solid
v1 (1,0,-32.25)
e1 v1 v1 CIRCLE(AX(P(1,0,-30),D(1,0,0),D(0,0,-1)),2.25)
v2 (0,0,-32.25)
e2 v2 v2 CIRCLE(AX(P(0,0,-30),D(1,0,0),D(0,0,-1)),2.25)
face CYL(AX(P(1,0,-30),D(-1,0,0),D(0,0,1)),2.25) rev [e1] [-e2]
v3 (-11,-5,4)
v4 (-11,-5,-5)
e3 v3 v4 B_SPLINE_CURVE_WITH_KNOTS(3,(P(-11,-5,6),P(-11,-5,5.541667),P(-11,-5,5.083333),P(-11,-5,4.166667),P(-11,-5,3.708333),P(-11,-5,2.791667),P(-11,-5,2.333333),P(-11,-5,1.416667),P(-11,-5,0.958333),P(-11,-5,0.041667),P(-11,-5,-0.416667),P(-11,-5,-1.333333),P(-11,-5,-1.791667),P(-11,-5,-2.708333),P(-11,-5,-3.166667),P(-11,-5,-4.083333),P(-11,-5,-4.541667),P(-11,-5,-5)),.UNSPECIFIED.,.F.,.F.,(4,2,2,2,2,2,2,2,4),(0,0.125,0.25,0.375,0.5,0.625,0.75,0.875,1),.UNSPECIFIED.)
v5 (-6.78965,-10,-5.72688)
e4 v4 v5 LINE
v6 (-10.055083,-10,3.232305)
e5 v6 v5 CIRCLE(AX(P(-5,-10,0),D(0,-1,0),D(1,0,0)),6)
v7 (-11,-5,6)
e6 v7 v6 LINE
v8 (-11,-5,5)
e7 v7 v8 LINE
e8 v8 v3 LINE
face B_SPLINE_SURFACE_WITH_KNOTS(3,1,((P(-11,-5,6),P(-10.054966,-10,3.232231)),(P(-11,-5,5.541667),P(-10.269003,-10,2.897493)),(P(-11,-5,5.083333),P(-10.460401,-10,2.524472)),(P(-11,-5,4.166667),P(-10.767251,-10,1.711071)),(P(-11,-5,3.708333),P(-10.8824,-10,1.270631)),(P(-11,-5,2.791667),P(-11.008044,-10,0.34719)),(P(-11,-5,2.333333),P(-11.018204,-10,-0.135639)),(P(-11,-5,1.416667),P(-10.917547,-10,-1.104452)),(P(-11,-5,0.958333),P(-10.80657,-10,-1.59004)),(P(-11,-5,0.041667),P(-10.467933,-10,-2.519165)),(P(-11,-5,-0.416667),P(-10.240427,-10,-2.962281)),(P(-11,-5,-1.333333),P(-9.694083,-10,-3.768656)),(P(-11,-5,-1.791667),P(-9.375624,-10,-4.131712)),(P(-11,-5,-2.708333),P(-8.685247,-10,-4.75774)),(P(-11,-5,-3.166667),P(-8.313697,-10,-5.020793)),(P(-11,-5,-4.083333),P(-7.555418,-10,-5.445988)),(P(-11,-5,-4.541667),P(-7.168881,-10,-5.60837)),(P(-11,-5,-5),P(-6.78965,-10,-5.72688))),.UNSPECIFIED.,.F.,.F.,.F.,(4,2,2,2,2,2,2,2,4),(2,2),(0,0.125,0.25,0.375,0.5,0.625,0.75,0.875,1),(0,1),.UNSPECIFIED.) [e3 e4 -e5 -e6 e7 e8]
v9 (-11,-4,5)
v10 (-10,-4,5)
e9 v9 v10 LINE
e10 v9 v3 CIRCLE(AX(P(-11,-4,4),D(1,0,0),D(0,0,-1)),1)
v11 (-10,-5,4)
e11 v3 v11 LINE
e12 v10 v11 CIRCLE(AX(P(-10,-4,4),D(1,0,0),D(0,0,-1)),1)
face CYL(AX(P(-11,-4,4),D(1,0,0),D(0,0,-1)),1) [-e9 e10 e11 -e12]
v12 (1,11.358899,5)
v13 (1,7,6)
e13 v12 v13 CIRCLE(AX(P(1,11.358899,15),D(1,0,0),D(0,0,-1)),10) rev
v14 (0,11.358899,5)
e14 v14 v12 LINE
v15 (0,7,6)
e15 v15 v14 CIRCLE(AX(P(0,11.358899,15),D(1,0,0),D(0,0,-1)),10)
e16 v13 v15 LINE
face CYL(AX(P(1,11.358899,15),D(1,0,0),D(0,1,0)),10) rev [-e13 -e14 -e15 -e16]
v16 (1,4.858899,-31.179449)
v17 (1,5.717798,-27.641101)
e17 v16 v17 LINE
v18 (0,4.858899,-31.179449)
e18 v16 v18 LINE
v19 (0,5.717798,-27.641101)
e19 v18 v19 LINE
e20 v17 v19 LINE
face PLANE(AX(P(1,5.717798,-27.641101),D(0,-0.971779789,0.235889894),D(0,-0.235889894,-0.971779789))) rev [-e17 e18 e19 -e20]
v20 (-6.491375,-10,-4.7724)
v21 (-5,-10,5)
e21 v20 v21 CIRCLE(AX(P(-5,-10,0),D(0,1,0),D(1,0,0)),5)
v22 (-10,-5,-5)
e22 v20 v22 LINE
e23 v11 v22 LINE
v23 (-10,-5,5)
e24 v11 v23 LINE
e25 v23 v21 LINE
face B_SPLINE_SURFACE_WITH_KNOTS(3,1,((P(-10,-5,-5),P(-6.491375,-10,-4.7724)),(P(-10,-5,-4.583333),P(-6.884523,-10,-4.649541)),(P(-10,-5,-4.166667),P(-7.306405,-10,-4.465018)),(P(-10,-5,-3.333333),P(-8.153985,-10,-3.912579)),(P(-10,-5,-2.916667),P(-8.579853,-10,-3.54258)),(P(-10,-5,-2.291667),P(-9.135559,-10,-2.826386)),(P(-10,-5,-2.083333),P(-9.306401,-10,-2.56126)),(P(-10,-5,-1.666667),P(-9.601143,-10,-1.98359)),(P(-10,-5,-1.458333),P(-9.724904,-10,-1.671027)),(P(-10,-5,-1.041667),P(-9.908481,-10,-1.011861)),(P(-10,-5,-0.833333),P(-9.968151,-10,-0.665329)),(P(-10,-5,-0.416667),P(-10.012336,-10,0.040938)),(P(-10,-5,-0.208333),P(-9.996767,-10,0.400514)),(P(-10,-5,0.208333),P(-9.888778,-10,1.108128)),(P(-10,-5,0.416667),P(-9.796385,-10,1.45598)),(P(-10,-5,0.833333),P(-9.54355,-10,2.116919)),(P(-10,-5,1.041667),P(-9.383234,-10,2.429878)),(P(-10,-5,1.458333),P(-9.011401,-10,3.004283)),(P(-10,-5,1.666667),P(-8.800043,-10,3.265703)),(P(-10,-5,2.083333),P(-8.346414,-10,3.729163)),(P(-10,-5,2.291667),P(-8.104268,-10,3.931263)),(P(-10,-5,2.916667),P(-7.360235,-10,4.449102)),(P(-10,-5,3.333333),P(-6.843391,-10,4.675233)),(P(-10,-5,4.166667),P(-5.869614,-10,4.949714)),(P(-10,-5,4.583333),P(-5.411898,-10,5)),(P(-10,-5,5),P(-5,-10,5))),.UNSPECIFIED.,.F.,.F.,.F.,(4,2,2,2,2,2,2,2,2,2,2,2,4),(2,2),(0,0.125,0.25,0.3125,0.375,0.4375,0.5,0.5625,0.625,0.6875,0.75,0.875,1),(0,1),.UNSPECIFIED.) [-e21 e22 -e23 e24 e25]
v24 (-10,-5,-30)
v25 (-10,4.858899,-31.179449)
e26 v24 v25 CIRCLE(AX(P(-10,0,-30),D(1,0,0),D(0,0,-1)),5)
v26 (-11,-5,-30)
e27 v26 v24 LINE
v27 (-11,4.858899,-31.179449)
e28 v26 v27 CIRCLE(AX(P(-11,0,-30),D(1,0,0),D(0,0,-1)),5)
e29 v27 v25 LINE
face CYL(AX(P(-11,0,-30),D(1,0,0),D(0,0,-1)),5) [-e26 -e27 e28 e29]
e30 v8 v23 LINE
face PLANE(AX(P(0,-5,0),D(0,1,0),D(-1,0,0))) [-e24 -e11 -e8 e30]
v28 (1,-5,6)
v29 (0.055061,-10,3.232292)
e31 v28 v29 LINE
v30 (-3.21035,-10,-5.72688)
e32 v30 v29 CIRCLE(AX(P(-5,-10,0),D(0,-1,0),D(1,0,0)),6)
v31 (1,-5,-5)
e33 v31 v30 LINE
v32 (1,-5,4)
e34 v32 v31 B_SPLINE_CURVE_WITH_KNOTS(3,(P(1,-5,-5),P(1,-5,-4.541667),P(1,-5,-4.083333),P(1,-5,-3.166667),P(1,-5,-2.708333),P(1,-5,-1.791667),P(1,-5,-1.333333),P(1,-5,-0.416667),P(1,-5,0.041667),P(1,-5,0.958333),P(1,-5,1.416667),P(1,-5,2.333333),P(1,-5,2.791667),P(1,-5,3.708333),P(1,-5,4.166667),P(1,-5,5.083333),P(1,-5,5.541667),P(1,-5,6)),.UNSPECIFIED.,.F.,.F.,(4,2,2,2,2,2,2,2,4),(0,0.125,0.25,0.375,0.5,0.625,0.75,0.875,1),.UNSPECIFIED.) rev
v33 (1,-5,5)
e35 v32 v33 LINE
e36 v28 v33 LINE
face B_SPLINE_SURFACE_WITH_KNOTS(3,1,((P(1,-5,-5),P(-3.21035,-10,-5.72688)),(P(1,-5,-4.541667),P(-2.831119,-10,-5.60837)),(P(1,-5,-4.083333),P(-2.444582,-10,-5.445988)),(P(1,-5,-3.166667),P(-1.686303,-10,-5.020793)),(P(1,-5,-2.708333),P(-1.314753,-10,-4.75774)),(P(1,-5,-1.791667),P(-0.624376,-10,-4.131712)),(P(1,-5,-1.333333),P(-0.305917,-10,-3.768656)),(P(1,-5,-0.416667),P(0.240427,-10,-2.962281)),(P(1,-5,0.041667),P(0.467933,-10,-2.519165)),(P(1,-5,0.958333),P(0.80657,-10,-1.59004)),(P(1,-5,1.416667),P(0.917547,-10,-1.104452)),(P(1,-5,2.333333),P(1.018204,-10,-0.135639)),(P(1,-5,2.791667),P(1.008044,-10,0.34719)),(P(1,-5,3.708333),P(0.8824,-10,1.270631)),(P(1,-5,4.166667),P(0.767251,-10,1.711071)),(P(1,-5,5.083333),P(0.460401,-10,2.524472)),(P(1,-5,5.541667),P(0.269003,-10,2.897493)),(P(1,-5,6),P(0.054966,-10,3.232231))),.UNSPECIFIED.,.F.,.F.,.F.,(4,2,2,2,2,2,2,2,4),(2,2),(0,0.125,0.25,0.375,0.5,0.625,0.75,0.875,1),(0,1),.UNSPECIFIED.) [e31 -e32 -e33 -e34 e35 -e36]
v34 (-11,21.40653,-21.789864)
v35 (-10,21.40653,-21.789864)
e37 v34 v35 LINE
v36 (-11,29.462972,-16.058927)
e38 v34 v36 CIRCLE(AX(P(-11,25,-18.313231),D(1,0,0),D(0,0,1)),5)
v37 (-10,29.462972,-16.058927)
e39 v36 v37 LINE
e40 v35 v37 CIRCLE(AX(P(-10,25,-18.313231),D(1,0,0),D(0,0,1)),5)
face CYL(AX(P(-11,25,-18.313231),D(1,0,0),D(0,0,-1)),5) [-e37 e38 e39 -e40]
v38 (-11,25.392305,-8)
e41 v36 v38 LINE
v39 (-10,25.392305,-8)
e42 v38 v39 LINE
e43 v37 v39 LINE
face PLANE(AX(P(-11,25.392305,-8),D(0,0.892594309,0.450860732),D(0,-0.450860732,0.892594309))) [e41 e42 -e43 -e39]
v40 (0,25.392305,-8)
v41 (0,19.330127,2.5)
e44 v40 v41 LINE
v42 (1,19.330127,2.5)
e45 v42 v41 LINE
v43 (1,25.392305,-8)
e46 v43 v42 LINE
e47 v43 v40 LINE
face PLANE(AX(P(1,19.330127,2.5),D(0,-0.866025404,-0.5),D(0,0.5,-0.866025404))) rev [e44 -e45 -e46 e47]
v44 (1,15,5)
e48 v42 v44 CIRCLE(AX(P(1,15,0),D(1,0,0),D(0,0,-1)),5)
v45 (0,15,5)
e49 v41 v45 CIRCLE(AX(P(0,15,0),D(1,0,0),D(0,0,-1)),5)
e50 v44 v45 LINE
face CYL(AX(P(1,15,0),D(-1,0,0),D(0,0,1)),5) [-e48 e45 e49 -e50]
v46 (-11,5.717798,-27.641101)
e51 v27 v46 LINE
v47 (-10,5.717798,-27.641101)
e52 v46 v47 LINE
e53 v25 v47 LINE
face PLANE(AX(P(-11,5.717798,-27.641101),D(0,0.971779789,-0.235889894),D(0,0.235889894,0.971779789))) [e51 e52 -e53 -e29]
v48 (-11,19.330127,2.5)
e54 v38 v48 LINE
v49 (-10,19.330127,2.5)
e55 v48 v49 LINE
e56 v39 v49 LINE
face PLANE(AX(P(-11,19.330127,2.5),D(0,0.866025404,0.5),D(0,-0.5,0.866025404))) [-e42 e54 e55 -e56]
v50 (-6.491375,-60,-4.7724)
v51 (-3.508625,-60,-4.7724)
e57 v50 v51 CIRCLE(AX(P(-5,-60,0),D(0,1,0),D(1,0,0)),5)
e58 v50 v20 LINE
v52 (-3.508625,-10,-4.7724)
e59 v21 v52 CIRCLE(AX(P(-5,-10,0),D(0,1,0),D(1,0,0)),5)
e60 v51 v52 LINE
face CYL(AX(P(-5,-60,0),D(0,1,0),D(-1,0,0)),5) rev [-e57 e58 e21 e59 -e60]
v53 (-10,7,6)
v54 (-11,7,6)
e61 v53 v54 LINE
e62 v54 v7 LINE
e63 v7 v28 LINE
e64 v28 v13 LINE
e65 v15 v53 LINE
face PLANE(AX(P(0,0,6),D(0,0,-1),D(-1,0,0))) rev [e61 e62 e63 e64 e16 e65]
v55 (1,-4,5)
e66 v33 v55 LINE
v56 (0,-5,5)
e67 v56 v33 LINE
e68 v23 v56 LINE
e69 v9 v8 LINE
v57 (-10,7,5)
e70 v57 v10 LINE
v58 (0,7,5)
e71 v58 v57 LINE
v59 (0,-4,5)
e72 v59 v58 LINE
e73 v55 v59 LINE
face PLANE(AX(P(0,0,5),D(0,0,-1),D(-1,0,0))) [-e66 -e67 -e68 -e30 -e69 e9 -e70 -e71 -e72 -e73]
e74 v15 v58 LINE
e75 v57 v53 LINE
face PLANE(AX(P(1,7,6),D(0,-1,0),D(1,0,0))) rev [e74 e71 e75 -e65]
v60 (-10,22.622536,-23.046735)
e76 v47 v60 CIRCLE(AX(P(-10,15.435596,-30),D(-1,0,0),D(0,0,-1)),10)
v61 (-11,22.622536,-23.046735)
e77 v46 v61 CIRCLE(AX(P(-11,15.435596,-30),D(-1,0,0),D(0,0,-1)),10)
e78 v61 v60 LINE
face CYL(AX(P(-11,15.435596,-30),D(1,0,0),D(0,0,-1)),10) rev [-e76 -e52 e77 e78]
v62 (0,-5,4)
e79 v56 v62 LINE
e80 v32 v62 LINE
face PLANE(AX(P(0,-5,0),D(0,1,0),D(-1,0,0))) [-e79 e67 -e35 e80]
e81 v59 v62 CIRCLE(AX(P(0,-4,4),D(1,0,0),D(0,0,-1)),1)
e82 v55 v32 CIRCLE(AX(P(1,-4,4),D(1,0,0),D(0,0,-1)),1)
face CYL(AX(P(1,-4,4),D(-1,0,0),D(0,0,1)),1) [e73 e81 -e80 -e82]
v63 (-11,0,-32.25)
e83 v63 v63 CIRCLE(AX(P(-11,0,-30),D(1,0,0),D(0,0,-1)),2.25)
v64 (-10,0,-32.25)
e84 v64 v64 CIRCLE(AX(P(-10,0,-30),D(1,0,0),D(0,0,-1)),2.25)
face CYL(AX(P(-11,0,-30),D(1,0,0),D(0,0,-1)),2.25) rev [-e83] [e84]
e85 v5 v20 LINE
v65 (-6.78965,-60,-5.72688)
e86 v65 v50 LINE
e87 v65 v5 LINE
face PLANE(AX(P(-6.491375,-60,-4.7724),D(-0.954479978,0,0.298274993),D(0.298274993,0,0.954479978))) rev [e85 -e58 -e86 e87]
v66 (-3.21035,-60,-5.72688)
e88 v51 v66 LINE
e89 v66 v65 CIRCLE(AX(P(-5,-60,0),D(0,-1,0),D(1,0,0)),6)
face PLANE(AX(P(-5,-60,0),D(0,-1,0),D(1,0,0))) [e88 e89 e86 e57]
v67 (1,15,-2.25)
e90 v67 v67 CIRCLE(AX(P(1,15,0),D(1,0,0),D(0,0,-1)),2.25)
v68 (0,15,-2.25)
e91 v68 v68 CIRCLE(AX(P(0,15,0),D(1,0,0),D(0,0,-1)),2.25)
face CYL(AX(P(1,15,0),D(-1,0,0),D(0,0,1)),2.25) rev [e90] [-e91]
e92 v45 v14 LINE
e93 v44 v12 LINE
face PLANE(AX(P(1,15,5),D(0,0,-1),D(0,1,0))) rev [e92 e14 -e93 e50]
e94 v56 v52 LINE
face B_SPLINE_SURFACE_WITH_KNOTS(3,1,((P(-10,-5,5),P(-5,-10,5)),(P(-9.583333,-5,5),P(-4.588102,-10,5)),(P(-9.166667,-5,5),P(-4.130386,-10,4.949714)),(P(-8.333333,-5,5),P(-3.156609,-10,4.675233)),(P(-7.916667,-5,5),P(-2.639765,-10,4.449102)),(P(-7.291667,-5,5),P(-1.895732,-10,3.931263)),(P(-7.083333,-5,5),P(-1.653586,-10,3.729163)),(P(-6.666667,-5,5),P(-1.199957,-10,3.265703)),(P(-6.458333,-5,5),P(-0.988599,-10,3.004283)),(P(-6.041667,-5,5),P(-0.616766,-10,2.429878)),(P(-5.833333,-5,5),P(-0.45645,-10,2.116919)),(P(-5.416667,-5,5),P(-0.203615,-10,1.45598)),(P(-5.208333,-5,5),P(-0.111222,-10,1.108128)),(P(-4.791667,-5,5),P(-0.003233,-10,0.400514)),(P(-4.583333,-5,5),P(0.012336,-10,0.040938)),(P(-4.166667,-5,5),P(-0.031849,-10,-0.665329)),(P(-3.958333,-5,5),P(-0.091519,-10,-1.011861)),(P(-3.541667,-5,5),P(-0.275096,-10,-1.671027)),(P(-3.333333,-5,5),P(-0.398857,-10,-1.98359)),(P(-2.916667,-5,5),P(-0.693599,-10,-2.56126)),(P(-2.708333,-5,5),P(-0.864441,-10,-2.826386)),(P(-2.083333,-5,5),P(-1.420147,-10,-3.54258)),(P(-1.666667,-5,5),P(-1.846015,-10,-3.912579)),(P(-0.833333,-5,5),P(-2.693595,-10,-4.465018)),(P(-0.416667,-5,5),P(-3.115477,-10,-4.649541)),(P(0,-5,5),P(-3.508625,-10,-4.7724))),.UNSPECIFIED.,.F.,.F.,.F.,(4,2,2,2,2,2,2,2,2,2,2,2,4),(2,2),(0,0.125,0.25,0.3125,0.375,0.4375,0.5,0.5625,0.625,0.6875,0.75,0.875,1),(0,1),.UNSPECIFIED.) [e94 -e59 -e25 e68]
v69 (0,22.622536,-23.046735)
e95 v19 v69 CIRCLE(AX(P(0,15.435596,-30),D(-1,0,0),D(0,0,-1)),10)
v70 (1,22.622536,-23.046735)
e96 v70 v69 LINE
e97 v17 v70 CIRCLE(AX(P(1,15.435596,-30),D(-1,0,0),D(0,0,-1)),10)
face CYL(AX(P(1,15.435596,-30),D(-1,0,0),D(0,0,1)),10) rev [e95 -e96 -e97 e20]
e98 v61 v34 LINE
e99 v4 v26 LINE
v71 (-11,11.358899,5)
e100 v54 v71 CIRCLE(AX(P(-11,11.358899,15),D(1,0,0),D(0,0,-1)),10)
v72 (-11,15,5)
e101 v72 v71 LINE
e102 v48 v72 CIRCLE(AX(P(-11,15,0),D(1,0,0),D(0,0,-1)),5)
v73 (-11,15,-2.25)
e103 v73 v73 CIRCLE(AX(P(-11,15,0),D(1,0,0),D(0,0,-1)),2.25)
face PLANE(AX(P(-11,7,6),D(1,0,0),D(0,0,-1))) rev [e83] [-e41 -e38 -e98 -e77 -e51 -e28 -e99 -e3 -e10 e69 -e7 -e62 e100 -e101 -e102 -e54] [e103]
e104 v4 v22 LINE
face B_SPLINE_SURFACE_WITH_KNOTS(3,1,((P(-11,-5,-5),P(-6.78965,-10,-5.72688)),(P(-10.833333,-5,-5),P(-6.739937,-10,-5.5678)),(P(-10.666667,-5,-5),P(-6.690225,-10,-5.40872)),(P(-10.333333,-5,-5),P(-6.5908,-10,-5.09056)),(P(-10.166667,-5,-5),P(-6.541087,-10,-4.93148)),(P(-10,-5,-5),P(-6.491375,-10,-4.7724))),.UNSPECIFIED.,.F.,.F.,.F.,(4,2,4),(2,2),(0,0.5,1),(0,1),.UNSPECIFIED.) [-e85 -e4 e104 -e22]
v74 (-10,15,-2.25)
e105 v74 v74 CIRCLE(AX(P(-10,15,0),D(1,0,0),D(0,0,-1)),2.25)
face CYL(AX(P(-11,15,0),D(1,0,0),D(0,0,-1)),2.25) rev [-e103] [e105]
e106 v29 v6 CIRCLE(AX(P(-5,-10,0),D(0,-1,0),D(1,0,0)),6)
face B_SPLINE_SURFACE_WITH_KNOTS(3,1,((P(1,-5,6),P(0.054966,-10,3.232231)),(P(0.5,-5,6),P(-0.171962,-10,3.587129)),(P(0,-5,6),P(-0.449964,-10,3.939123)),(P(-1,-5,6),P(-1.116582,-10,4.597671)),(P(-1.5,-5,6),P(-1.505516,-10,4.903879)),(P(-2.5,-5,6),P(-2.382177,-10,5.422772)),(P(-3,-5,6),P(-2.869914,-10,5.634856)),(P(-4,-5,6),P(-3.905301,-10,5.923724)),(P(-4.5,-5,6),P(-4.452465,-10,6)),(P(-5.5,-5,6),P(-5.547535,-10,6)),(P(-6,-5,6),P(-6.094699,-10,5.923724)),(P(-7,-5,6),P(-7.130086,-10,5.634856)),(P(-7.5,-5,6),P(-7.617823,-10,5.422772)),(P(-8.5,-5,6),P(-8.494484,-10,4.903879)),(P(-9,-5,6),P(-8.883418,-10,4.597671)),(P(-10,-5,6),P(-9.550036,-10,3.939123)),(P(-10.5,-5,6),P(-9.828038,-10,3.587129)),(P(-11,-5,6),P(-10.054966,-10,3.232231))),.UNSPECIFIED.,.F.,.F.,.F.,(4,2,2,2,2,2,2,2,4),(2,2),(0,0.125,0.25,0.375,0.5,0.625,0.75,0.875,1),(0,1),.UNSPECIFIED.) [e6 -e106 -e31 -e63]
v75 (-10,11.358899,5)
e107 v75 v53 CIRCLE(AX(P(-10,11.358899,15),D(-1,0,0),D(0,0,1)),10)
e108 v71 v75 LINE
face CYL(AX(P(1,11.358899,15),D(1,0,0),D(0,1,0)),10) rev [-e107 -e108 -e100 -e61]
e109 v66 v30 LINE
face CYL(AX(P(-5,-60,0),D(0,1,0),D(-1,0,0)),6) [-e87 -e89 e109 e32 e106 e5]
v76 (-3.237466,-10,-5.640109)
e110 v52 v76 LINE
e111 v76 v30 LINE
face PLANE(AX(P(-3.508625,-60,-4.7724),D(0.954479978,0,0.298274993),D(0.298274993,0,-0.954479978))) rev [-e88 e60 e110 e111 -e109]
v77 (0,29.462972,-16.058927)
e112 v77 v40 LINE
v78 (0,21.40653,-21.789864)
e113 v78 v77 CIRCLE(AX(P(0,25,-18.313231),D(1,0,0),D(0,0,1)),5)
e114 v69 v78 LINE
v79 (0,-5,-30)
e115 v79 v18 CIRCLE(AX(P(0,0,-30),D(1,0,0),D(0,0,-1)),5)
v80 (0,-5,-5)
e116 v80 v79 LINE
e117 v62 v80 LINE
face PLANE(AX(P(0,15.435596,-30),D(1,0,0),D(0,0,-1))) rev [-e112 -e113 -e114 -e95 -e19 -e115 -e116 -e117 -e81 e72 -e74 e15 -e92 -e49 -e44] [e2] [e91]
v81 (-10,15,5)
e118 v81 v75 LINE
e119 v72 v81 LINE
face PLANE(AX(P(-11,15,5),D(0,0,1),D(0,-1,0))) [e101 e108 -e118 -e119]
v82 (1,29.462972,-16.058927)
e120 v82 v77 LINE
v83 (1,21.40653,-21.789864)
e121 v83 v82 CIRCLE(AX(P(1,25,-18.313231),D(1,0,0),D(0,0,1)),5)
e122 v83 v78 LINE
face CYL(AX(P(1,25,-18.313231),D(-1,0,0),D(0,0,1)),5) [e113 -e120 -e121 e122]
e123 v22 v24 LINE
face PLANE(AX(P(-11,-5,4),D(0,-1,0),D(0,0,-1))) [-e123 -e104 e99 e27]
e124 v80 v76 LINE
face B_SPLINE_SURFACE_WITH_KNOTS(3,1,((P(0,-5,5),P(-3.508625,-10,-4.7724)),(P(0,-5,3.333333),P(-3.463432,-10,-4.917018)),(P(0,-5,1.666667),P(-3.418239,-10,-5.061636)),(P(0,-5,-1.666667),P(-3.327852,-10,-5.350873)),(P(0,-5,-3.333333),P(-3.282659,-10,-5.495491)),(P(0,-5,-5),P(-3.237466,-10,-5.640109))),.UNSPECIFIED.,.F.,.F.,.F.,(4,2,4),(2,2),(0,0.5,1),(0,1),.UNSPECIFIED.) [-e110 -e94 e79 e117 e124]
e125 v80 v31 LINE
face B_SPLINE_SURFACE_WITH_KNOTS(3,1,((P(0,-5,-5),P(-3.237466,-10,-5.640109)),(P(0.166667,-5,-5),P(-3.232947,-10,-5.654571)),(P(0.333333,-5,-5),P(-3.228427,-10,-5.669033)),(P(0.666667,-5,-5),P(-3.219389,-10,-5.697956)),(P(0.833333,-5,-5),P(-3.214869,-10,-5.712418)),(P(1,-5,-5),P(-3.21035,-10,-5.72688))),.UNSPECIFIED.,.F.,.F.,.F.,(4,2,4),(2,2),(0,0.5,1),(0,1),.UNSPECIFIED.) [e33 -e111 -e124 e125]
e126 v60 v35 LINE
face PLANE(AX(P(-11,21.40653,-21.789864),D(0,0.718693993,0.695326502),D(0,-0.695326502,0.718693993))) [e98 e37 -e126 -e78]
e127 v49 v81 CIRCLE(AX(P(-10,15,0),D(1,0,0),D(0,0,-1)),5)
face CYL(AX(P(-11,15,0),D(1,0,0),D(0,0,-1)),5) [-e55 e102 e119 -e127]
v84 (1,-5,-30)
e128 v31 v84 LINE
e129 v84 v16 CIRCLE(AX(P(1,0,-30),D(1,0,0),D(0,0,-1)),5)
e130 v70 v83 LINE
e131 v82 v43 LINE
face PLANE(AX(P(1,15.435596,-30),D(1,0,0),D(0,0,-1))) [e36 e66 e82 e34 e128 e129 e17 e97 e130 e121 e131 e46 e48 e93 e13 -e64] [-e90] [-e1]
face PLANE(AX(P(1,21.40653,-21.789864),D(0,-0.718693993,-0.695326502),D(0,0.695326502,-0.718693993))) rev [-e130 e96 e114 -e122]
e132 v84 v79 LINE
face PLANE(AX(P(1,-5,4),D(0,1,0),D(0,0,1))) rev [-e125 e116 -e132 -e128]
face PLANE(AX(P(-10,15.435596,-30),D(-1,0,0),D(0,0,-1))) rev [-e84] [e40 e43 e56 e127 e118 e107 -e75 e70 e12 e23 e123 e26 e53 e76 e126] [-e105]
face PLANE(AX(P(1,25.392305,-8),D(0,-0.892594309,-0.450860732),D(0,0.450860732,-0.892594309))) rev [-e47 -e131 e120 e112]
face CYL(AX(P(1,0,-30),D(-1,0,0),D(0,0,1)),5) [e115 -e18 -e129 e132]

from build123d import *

# Parameters (mm, degrees)
SKETCH1_R            = 2.25
BOSS_EXTRUDE1_DEPTH  = 1
SKETCH2_R            = 3
BOSS_EXTRUDE2_DEPTH  = 10
SKETCH3_R            = 3.5
BOSS_EXTRUDE3_DEPTH  = 1.5
FILLET1_R            = 0.5
FILLET2_R            = 0.5
SKETCH4_W            = 12
SKETCH4_H            = 12
BOSS_EXTRUDE4_DEPTH  = 1
FILLET1_OF_MIRROR1_R = 0.5
FILLET2_OF_MIRROR1_R = 0.5
BOSS_EXTRUDE5_DEPTH  = 50
FILLET3_R            = 10
SKETCH8_R            = 8.284786219
CUT_EXTRUDE1_DEPTH   = 15
SKETCH9_R            = 7.33981862
CUT_EXTRUDE2_DEPTH   = 15


with BuildPart() as part:
    # Sketch1 → Boss-Extrude1 (new body)
    with BuildSketch(Plane(origin=(0, 0, 0), x_dir=(0, 0, -1), z_dir=(1, 0, 0))):
        with BuildLine():
            Line((-5, 15), (-5, -4))
            ThreePointArc((-5, -4), (-4.707106781, -4.707106781), (-4, -5))
            Line((-4, -5), (30, -5))
            ThreePointArc((30, -5), (34.964599416, -0.593929828), (31.179449472, 4.858898944))
            Line((31.179449472, 4.858898944), (27.641101056, 5.717797887))
            ThreePointArc((27.641101056, 5.717797887), (20.35004458, 12.812932929), (23.046734983, 22.622535708))
            Line((23.046734983, 22.622535708), (21.789863611, 21.406530033))
            ThreePointArc((21.789863611, 21.406530033), (22.387551219, 27.898260788), (16.058927441, 29.462971544))
            Line((16.058927441, 29.462971544), (8, 25.392304845))
            Line((8, 25.392304845), (-2.5, 19.330127019))
            ThreePointArc((-2.5, 19.330127019), (-4.330127019, 17.5), (-5, 15))
        make_face()
        with Locations((0, 15)):
            Circle(SKETCH1_R, mode=Mode.SUBTRACT)
        with Locations((30, 0)):
            Circle(SKETCH1_R, mode=Mode.SUBTRACT)
    boss_extrude1 = extrude(amount=BOSS_EXTRUDE1_DEPTH)

    # Sketch2 → Boss-Extrude2 (add)
    with BuildSketch(Plane(origin=(1, 0, 0), x_dir=(0, 0, -1), z_dir=(1, 0, 0))):
        with Locations((18.313231103, 25)):
            Circle(SKETCH2_R)
    boss_extrude2 = extrude(amount=BOSS_EXTRUDE2_DEPTH)

    # Sketch3 → Boss-Extrude3 (add)
    with BuildSketch(Plane(origin=(11, 0, 0), x_dir=(0, 0, -1), z_dir=(1, 0, 0))):
        with Locations((18.313231103, 25)):
            Circle(SKETCH3_R)
    boss_extrude3 = extrude(amount=-BOSS_EXTRUDE3_DEPTH)

    # Fillet1
    fillet1_edges = [part.edges().sort_by_distance(p)[0] for p in [
        (1, 25, -15.313231103),
        (9.5, 25, -14.813231103),
        (11, 25, -14.813231103),
    ]]
    fillet(fillet1_edges, radius=FILLET1_R - 0.0001)  # a hair under: the kernel refuses the full size

    # Fillet2
    fillet2_edges = [part.edges().sort_by_distance(p)[0] for p in [
        (9.5, 25, -15.313231103),
    ]]
    fillet(fillet2_edges, radius=FILLET2_R)

    # Sketch4 → Boss-Extrude4 (add)
    with BuildSketch(Plane.XY.offset(5)):
        with Locations((-5, 1)):
            Rectangle(SKETCH4_W, SKETCH4_H)
    extrude(amount=BOSS_EXTRUDE4_DEPTH)

    # Mirror1: Boss-Extrude1, Boss-Extrude2, Boss-Extrude3 across plane
    add(boss_extrude1.mirror(Plane(origin=(-5, 0, 0), x_dir=(0, 0, 1), z_dir=(1, 0, 0))))
    add(boss_extrude2.mirror(Plane(origin=(-5, 0, 0), x_dir=(0, 0, 1), z_dir=(1, 0, 0))))
    add(boss_extrude3.mirror(Plane(origin=(-5, 0, 0), x_dir=(0, 0, 1), z_dir=(1, 0, 0))))

    # Fillet1 of Mirror1
    fillet1_of_mirror1_edges = [part.edges().sort_by_distance(p)[0] for p in [
        (-11, 25, -15.313231103),
        (-19.5, 25, -14.813231103),
        (-21, 25, -14.813231103),
    ]]
    fillet(fillet1_of_mirror1_edges, radius=FILLET1_OF_MIRROR1_R - 0.0001)  # a hair under: the kernel refuses the full size

    # Fillet2 of Mirror1
    fillet2_of_mirror1_edges = [part.edges().sort_by_distance(p)[0] for p in [
        (-19.5, 25, -15.313231103),
    ]]
    fillet(fillet2_of_mirror1_edges, radius=FILLET2_OF_MIRROR1_R)

    # Loft1: read off the stored shape, not the designer's step
    # Loft1: loft between two sections, ruled curve by curve
    loft1_from = [
        Edge.make_bspline([(-10, -5, -5), (-10, -5, -4.583333333), (-10, -5, -4.166666667), (-10, -5, -3.333333333), (-10, -5, -2.916666667), (-10, -5, -2.291666667), (-10, -5, -2.083333333), (-10, -5, -1.666666667), (-10, -5, -1.458333333), (-10, -5, -1.041666667), (-10, -5, -0.833333333), (-10, -5, -0.416666667), (-10, -5, -0.208333333), (-10, -5, 0.208333333), (-10, -5, 0.416666667), (-10, -5, 0.833333333), (-10, -5, 1.041666667), (-10, -5, 1.458333333), (-10, -5, 1.666666667), (-10, -5, 2.083333333), (-10, -5, 2.291666667), (-10, -5, 2.916666667), (-10, -5, 3.333333333), (-10, -5, 4.166666667), (-10, -5, 4.583333333), (-10, -5, 5)], [0, 0, 0, 0, 0.125, 0.125, 0.25, 0.25, 0.3125, 0.3125, 0.375, 0.375, 0.4375, 0.4375, 0.5, 0.5, 0.5625, 0.5625, 0.625, 0.625, 0.6875, 0.6875, 0.75, 0.75, 0.875, 0.875, 1, 1, 1, 1], 3),
        Edge.make_bspline([(-10, -5, 5), (-9.583333333, -5, 5), (-9.166666667, -5, 5), (-8.333333333, -5, 5), (-7.916666667, -5, 5), (-7.291666667, -5, 5), (-7.083333333, -5, 5), (-6.666666667, -5, 5), (-6.458333333, -5, 5), (-6.041666667, -5, 5), (-5.833333333, -5, 5), (-5.416666667, -5, 5), (-5.208333333, -5, 5), (-4.791666667, -5, 5), (-4.583333333, -5, 5), (-4.166666667, -5, 5), (-3.958333333, -5, 5), (-3.541666667, -5, 5), (-3.333333333, -5, 5), (-2.916666667, -5, 5), (-2.708333333, -5, 5), (-2.083333333, -5, 5), (-1.666666667, -5, 5), (-0.833333333, -5, 5), (-0.416666667, -5, 5), (0, -5, 5)], [0, 0, 0, 0, 0.125, 0.125, 0.25, 0.25, 0.3125, 0.3125, 0.375, 0.375, 0.4375, 0.4375, 0.5, 0.5, 0.5625, 0.5625, 0.625, 0.625, 0.6875, 0.6875, 0.75, 0.75, 0.875, 0.875, 1, 1, 1, 1], 3),
        Edge.make_bspline([(-11, -5, -5), (-10.833333333, -5, -5), (-10.666666667, -5, -5), (-10.333333333, -5, -5), (-10.166666667, -5, -5), (-10, -5, -5)], [0, 0, 0, 0, 0.5, 0.5, 1, 1, 1, 1], 3),
        Edge.make_bspline([(0, -5, 5), (0, -5, 3.333333333), (0, -5, 1.666666667), (0, -5, -1.666666667), (0, -5, -3.333333333), (0, -5, -5)], [0, 0, 0, 0, 0.5, 0.5, 1, 1, 1, 1], 3),
        Edge.make_bspline([(0, -5, -5), (0.166666667, -5, -5), (0.333333333, -5, -5), (0.666666667, -5, -5), (0.833333333, -5, -5), (1, -5, -5)], [0, 0, 0, 0, 0.5, 0.5, 1, 1, 1, 1], 3),
        Edge.make_bspline([(1, -5, -5), (1, -5, -4.541666667), (1, -5, -4.083333333), (1, -5, -3.166666667), (1, -5, -2.708333333), (1, -5, -1.791666667), (1, -5, -1.333333333), (1, -5, -0.416666667), (1, -5, 0.041666667), (1, -5, 0.958333333), (1, -5, 1.416666667), (1, -5, 2.333333333), (1, -5, 2.791666667), (1, -5, 3.708333333), (1, -5, 4.166666667), (1, -5, 5.083333333), (1, -5, 5.541666667), (1, -5, 6)], [0, 0, 0, 0, 0.125, 0.125, 0.25, 0.25, 0.375, 0.375, 0.5, 0.5, 0.625, 0.625, 0.75, 0.75, 0.875, 0.875, 1, 1, 1, 1], 3),
        Edge.make_bspline([(1, -5, 6), (0.5, -5, 6), (0, -5, 6), (-1, -5, 6), (-1.5, -5, 6), (-2.5, -5, 6), (-3, -5, 6), (-4, -5, 6), (-4.5, -5, 6), (-5.5, -5, 6), (-6, -5, 6), (-7, -5, 6), (-7.5, -5, 6), (-8.5, -5, 6), (-9, -5, 6), (-10, -5, 6), (-10.5, -5, 6), (-11, -5, 6)], [0, 0, 0, 0, 0.125, 0.125, 0.25, 0.25, 0.375, 0.375, 0.5, 0.5, 0.625, 0.625, 0.75, 0.75, 0.875, 0.875, 1, 1, 1, 1], 3),
        Edge.make_bspline([(-11, -5, 6), (-11, -5, 5.541666667), (-11, -5, 5.083333333), (-11, -5, 4.166666667), (-11, -5, 3.708333333), (-11, -5, 2.791666667), (-11, -5, 2.333333333), (-11, -5, 1.416666667), (-11, -5, 0.958333333), (-11, -5, 0.041666667), (-11, -5, -0.416666667), (-11, -5, -1.333333333), (-11, -5, -1.791666667), (-11, -5, -2.708333333), (-11, -5, -3.166666667), (-11, -5, -4.083333333), (-11, -5, -4.541666667), (-11, -5, -5)], [0, 0, 0, 0, 0.125, 0.125, 0.25, 0.25, 0.375, 0.375, 0.5, 0.5, 0.625, 0.625, 0.75, 0.75, 0.875, 0.875, 1, 1, 1, 1], 3),
    ]
    loft1_to = [
        Edge.make_bspline([(-6.491374966, -10, -4.77239989), (-6.884523079, -10, -4.649541105), (-7.306405333, -10, -4.465018398), (-8.153984507, -10, -3.912579276), (-8.579853175, -10, -3.542579514), (-9.13555864, -10, -2.826386266), (-9.306401184, -10, -2.561259986), (-9.601142837, -10, -1.983589792), (-9.724904097, -10, -1.6710271), (-9.908481295, -10, -1.011860503), (-9.968151405, -10, -0.665329215), (-10.012336326, -10, 0.040937796), (-9.996767222, -10, 0.400514491), (-9.888777725, -10, 1.108127646), (-9.796385387, -10, 1.455980277), (-9.543549977, -10, 2.116918741), (-9.383234434, -10, 2.429877815), (-9.011400762, -10, 3.004282647), (-8.800043483, -10, 3.265702589), (-8.346413903, -10, 3.729163159), (-8.104267576, -10, 3.931262826), (-7.360235299, -10, 4.449101898), (-6.843390506, -10, 4.675233288), (-5.86961438, -10, 4.949713698), (-5.411897706, -10, 5), (-5, -10, 5)], [0, 0, 0, 0, 0.125, 0.125, 0.25, 0.25, 0.3125, 0.3125, 0.375, 0.375, 0.4375, 0.4375, 0.5, 0.5, 0.5625, 0.5625, 0.625, 0.625, 0.6875, 0.6875, 0.75, 0.75, 0.875, 0.875, 1, 1, 1, 1], 3),
        Edge.make_bspline([(-5, -10, 5), (-4.588102294, -10, 5), (-4.13038562, -10, 4.949713698), (-3.156609494, -10, 4.675233288), (-2.639764701, -10, 4.449101898), (-1.895732424, -10, 3.931262826), (-1.653586097, -10, 3.729163159), (-1.199956517, -10, 3.265702589), (-0.988599238, -10, 3.004282647), (-0.616765566, -10, 2.429877815), (-0.456450023, -10, 2.116918741), (-0.203614613, -10, 1.455980277), (-0.111222275, -10, 1.108127646), (-0.003232778, -10, 0.400514491), (0.012336326, -10, 0.040937796), (-0.031848595, -10, -0.665329215), (-0.091518705, -10, -1.011860503), (-0.275095903, -10, -1.6710271), (-0.398857163, -10, -1.983589792), (-0.693598816, -10, -2.561259986), (-0.86444136, -10, -2.826386266), (-1.420146825, -10, -3.542579514), (-1.846015493, -10, -3.912579276), (-2.693594667, -10, -4.465018398), (-3.115476921, -10, -4.649541105), (-3.508625034, -10, -4.77239989)], [0, 0, 0, 0, 0.125, 0.125, 0.25, 0.25, 0.3125, 0.3125, 0.375, 0.375, 0.4375, 0.4375, 0.5, 0.5, 0.5625, 0.5625, 0.625, 0.625, 0.6875, 0.6875, 0.75, 0.75, 0.875, 0.875, 1, 1, 1, 1], 3),
        Edge.make_bspline([(-6.789649959, -10, -5.726879868), (-6.73993746, -10, -5.567799872), (-6.690224961, -10, -5.408719876), (-6.590799963, -10, -5.090559883), (-6.541087465, -10, -4.931479887), (-6.491374966, -10, -4.77239989)], [0, 0, 0, 0, 0.5, 0.5, 1, 1, 1, 1], 3),
        Edge.make_bspline([(-3.508625034, -10, -4.77239989), (-3.463431854, -10, -4.917018069), (-3.418238673, -10, -5.061636247), (-3.327852311, -10, -5.350872604), (-3.28265913, -10, -5.495490783), (-3.23746595, -10, -5.640108961)], [0, 0, 0, 0, 0.5, 0.5, 1, 1, 1, 1], 3),
        Edge.make_bspline([(-3.23746595, -10, -5.640108961), (-3.232946632, -10, -5.654570779), (-3.228427313, -10, -5.669032597), (-3.219388677, -10, -5.697956233), (-3.214869359, -10, -5.71241805), (-3.210350041, -10, -5.726879868)], [0, 0, 0, 0, 0.5, 0.5, 1, 1, 1, 1], 3),
        Edge.make_bspline([(-3.210350041, -10, -5.726879868), (-2.831118631, -10, -5.608370053), (-2.444582437, -10, -5.445988039), (-1.68630321, -10, -5.020792589), (-1.314753176, -10, -4.757739856), (-0.6243761, -10, -4.131712499), (-0.305916835, -10, -3.768655763), (0.240427003, -10, -2.962280853), (0.467933473, -10, -2.519164633), (0.80657041, -10, -1.590039936), (0.917547461, -10, -1.104452382), (1.018204484, -10, -0.135638547), (1.008043933, -10, 0.34718985), (0.882399891, -10, 1.27063142), (0.767250763, -10, 1.711070799), (0.460401457, -10, 2.524472335), (0.269002994, -10, 2.897493483), (0.054966106, -10, 3.232231066)], [0, 0, 0, 0, 0.125, 0.125, 0.25, 0.25, 0.375, 0.375, 0.5, 0.5, 0.625, 0.625, 0.75, 0.75, 0.875, 0.875, 1, 1, 1, 1], 3),
        Edge.make_bspline([(0.054966106, -10, 3.232231066), (-0.171961928, -10, 3.587129432), (-0.449964287, -10, 3.939123113), (-1.116581513, -10, 4.597670796), (-1.505515592, -10, 4.903878589), (-2.382177474, -10, 5.42277159), (-2.869914306, -10, 5.634856039), (-3.90530121, -10, 5.923723677), (-4.452465382, -10, 6), (-5.547534618, -10, 6), (-6.09469879, -10, 5.923723677), (-7.130085694, -10, 5.634856039), (-7.617822526, -10, 5.42277159), (-8.494484408, -10, 4.903878589), (-8.883418487, -10, 4.597670796), (-9.550035713, -10, 3.939123113), (-9.828038072, -10, 3.587129432), (-10.054966106, -10, 3.232231066)], [0, 0, 0, 0, 0.125, 0.125, 0.25, 0.25, 0.375, 0.375, 0.5, 0.5, 0.625, 0.625, 0.75, 0.75, 0.875, 0.875, 1, 1, 1, 1], 3),
        Edge.make_bspline([(-10.054966106, -10, 3.232231066), (-10.269002994, -10, 2.897493483), (-10.460401457, -10, 2.524472335), (-10.767250763, -10, 1.711070799), (-10.882399891, -10, 1.27063142), (-11.008043933, -10, 0.34718985), (-11.018204484, -10, -0.135638547), (-10.917547461, -10, -1.104452382), (-10.80657041, -10, -1.590039936), (-10.467933473, -10, -2.519164633), (-10.240427003, -10, -2.962280853), (-9.694083165, -10, -3.768655763), (-9.3756239, -10, -4.131712499), (-8.685246824, -10, -4.757739856), (-8.31369679, -10, -5.020792589), (-7.555417563, -10, -5.445988039), (-7.168881369, -10, -5.608370053), (-6.789649959, -10, -5.726879868)], [0, 0, 0, 0, 0.125, 0.125, 0.25, 0.25, 0.375, 0.375, 0.5, 0.5, 0.625, 0.625, 0.75, 0.75, 0.875, 0.875, 1, 1, 1, 1], 3),
    ]
    loft1 = Solid(Shell([*[Face.make_surface_from_curves(loft1_from[k], loft1_to[k]) for k in range(8)], Face(Wire(loft1_from)), Face(Wire(loft1_to))]))
    add(loft1)

    # Sketch7<3> → Boss-Extrude5 (add)
    with BuildSketch(Plane(origin=(0, -10, 0), x_dir=(-1, 0, 0), z_dir=(0, -1, 0))):
        with BuildLine():
            Line((3.508625034, 4.77239989), (3.210350041, 5.726879868))
            ThreePointArc((3.210350041, 5.726879868), (5, -6), (6.789649959, 5.726879868))
            Line((6.789649959, 5.726879868), (6.491374966, 4.77239989))
            ThreePointArc((6.491374966, 4.77239989), (5, -5), (3.508625034, 4.77239989))
        make_face()
    extrude(amount=BOSS_EXTRUDE5_DEPTH)

    # Fillet3
    # the kernel refuses this fillet: 10 mm, written as the material it adds along each edge
    with BuildSketch(Plane(origin=(0.897247359, 7, 5), x_dir=(0, 0, 1), z_dir=(-1, 0, 0))) as fillet3_piece_1_section:
        with BuildLine():
            CenterArc((10, 4.358898944), FILLET3_R, 180, 25.841932763)
            Line((0, 4.358898944), (0, 0))
            Line((0, 0), (1, 0))
        make_face()
    fillet3_piece_1 = extrude(amount=22.794494718, mode=Mode.PRIVATE)
    fillet3_piece_1 = split(fillet3_piece_1, bisect_by=Plane(origin=(0, 7, 5), z_dir=(1, 0, 0)), keep=Keep.TOP, mode=Mode.PRIVATE)
    add(fillet3_piece_1)
    with BuildSketch(Plane(origin=(-10, 7, 5), x_dir=(0, 0, 1), z_dir=(-1, 0, 0)), Plane(origin=(1, 7, 5), x_dir=(0, 0, 1), z_dir=(-1, 0, 0))) as fillet3_piece_2:
        with BuildLine():
            CenterArc((10, 4.358898944), FILLET3_R, 180, 25.841932763)
            Line((0, 4.358898944), (0, 0))
            Line((0, 0), (1, 0))
        make_face()
    extrude(amount=1)
    with BuildSketch(Plane(origin=(11.897247359, 7, 5), x_dir=(0, 0, 1), z_dir=(-1, 0, 0))) as fillet3_piece_3_section:
        with BuildLine():
            CenterArc((10, 4.358898944), FILLET3_R, 180, 25.841932763)
            Line((0, 4.358898944), (0, 0))
            Line((0, 0), (1, 0))
        make_face()
    fillet3_piece_3 = extrude(amount=22.794494718, mode=Mode.PRIVATE)
    fillet3_piece_3 = split(fillet3_piece_3, bisect_by=Plane(origin=(-10, 7, 5), z_dir=(-1, 0, 0)), keep=Keep.TOP, mode=Mode.PRIVATE)
    add(fillet3_piece_3)

    # Sketch8 → Cut-Extrude1 (cut)
    with BuildSketch(Plane(origin=(1, 0, 0), x_dir=(0, 0, -1), z_dir=(1, 0, 0))):
        with Locations((18.313231103, 25)):
            Circle(SKETCH8_R)
    extrude(amount=CUT_EXTRUDE1_DEPTH, mode=Mode.SUBTRACT)

    # Sketch9 → Cut-Extrude2 (cut)
    with BuildSketch(Plane.ZY.offset(11)):
        with Locations((-18.313231103, 25)):
            Circle(SKETCH9_R)
    extrude(amount=CUT_EXTRUDE2_DEPTH, mode=Mode.SUBTRACT)


solid = part.part
